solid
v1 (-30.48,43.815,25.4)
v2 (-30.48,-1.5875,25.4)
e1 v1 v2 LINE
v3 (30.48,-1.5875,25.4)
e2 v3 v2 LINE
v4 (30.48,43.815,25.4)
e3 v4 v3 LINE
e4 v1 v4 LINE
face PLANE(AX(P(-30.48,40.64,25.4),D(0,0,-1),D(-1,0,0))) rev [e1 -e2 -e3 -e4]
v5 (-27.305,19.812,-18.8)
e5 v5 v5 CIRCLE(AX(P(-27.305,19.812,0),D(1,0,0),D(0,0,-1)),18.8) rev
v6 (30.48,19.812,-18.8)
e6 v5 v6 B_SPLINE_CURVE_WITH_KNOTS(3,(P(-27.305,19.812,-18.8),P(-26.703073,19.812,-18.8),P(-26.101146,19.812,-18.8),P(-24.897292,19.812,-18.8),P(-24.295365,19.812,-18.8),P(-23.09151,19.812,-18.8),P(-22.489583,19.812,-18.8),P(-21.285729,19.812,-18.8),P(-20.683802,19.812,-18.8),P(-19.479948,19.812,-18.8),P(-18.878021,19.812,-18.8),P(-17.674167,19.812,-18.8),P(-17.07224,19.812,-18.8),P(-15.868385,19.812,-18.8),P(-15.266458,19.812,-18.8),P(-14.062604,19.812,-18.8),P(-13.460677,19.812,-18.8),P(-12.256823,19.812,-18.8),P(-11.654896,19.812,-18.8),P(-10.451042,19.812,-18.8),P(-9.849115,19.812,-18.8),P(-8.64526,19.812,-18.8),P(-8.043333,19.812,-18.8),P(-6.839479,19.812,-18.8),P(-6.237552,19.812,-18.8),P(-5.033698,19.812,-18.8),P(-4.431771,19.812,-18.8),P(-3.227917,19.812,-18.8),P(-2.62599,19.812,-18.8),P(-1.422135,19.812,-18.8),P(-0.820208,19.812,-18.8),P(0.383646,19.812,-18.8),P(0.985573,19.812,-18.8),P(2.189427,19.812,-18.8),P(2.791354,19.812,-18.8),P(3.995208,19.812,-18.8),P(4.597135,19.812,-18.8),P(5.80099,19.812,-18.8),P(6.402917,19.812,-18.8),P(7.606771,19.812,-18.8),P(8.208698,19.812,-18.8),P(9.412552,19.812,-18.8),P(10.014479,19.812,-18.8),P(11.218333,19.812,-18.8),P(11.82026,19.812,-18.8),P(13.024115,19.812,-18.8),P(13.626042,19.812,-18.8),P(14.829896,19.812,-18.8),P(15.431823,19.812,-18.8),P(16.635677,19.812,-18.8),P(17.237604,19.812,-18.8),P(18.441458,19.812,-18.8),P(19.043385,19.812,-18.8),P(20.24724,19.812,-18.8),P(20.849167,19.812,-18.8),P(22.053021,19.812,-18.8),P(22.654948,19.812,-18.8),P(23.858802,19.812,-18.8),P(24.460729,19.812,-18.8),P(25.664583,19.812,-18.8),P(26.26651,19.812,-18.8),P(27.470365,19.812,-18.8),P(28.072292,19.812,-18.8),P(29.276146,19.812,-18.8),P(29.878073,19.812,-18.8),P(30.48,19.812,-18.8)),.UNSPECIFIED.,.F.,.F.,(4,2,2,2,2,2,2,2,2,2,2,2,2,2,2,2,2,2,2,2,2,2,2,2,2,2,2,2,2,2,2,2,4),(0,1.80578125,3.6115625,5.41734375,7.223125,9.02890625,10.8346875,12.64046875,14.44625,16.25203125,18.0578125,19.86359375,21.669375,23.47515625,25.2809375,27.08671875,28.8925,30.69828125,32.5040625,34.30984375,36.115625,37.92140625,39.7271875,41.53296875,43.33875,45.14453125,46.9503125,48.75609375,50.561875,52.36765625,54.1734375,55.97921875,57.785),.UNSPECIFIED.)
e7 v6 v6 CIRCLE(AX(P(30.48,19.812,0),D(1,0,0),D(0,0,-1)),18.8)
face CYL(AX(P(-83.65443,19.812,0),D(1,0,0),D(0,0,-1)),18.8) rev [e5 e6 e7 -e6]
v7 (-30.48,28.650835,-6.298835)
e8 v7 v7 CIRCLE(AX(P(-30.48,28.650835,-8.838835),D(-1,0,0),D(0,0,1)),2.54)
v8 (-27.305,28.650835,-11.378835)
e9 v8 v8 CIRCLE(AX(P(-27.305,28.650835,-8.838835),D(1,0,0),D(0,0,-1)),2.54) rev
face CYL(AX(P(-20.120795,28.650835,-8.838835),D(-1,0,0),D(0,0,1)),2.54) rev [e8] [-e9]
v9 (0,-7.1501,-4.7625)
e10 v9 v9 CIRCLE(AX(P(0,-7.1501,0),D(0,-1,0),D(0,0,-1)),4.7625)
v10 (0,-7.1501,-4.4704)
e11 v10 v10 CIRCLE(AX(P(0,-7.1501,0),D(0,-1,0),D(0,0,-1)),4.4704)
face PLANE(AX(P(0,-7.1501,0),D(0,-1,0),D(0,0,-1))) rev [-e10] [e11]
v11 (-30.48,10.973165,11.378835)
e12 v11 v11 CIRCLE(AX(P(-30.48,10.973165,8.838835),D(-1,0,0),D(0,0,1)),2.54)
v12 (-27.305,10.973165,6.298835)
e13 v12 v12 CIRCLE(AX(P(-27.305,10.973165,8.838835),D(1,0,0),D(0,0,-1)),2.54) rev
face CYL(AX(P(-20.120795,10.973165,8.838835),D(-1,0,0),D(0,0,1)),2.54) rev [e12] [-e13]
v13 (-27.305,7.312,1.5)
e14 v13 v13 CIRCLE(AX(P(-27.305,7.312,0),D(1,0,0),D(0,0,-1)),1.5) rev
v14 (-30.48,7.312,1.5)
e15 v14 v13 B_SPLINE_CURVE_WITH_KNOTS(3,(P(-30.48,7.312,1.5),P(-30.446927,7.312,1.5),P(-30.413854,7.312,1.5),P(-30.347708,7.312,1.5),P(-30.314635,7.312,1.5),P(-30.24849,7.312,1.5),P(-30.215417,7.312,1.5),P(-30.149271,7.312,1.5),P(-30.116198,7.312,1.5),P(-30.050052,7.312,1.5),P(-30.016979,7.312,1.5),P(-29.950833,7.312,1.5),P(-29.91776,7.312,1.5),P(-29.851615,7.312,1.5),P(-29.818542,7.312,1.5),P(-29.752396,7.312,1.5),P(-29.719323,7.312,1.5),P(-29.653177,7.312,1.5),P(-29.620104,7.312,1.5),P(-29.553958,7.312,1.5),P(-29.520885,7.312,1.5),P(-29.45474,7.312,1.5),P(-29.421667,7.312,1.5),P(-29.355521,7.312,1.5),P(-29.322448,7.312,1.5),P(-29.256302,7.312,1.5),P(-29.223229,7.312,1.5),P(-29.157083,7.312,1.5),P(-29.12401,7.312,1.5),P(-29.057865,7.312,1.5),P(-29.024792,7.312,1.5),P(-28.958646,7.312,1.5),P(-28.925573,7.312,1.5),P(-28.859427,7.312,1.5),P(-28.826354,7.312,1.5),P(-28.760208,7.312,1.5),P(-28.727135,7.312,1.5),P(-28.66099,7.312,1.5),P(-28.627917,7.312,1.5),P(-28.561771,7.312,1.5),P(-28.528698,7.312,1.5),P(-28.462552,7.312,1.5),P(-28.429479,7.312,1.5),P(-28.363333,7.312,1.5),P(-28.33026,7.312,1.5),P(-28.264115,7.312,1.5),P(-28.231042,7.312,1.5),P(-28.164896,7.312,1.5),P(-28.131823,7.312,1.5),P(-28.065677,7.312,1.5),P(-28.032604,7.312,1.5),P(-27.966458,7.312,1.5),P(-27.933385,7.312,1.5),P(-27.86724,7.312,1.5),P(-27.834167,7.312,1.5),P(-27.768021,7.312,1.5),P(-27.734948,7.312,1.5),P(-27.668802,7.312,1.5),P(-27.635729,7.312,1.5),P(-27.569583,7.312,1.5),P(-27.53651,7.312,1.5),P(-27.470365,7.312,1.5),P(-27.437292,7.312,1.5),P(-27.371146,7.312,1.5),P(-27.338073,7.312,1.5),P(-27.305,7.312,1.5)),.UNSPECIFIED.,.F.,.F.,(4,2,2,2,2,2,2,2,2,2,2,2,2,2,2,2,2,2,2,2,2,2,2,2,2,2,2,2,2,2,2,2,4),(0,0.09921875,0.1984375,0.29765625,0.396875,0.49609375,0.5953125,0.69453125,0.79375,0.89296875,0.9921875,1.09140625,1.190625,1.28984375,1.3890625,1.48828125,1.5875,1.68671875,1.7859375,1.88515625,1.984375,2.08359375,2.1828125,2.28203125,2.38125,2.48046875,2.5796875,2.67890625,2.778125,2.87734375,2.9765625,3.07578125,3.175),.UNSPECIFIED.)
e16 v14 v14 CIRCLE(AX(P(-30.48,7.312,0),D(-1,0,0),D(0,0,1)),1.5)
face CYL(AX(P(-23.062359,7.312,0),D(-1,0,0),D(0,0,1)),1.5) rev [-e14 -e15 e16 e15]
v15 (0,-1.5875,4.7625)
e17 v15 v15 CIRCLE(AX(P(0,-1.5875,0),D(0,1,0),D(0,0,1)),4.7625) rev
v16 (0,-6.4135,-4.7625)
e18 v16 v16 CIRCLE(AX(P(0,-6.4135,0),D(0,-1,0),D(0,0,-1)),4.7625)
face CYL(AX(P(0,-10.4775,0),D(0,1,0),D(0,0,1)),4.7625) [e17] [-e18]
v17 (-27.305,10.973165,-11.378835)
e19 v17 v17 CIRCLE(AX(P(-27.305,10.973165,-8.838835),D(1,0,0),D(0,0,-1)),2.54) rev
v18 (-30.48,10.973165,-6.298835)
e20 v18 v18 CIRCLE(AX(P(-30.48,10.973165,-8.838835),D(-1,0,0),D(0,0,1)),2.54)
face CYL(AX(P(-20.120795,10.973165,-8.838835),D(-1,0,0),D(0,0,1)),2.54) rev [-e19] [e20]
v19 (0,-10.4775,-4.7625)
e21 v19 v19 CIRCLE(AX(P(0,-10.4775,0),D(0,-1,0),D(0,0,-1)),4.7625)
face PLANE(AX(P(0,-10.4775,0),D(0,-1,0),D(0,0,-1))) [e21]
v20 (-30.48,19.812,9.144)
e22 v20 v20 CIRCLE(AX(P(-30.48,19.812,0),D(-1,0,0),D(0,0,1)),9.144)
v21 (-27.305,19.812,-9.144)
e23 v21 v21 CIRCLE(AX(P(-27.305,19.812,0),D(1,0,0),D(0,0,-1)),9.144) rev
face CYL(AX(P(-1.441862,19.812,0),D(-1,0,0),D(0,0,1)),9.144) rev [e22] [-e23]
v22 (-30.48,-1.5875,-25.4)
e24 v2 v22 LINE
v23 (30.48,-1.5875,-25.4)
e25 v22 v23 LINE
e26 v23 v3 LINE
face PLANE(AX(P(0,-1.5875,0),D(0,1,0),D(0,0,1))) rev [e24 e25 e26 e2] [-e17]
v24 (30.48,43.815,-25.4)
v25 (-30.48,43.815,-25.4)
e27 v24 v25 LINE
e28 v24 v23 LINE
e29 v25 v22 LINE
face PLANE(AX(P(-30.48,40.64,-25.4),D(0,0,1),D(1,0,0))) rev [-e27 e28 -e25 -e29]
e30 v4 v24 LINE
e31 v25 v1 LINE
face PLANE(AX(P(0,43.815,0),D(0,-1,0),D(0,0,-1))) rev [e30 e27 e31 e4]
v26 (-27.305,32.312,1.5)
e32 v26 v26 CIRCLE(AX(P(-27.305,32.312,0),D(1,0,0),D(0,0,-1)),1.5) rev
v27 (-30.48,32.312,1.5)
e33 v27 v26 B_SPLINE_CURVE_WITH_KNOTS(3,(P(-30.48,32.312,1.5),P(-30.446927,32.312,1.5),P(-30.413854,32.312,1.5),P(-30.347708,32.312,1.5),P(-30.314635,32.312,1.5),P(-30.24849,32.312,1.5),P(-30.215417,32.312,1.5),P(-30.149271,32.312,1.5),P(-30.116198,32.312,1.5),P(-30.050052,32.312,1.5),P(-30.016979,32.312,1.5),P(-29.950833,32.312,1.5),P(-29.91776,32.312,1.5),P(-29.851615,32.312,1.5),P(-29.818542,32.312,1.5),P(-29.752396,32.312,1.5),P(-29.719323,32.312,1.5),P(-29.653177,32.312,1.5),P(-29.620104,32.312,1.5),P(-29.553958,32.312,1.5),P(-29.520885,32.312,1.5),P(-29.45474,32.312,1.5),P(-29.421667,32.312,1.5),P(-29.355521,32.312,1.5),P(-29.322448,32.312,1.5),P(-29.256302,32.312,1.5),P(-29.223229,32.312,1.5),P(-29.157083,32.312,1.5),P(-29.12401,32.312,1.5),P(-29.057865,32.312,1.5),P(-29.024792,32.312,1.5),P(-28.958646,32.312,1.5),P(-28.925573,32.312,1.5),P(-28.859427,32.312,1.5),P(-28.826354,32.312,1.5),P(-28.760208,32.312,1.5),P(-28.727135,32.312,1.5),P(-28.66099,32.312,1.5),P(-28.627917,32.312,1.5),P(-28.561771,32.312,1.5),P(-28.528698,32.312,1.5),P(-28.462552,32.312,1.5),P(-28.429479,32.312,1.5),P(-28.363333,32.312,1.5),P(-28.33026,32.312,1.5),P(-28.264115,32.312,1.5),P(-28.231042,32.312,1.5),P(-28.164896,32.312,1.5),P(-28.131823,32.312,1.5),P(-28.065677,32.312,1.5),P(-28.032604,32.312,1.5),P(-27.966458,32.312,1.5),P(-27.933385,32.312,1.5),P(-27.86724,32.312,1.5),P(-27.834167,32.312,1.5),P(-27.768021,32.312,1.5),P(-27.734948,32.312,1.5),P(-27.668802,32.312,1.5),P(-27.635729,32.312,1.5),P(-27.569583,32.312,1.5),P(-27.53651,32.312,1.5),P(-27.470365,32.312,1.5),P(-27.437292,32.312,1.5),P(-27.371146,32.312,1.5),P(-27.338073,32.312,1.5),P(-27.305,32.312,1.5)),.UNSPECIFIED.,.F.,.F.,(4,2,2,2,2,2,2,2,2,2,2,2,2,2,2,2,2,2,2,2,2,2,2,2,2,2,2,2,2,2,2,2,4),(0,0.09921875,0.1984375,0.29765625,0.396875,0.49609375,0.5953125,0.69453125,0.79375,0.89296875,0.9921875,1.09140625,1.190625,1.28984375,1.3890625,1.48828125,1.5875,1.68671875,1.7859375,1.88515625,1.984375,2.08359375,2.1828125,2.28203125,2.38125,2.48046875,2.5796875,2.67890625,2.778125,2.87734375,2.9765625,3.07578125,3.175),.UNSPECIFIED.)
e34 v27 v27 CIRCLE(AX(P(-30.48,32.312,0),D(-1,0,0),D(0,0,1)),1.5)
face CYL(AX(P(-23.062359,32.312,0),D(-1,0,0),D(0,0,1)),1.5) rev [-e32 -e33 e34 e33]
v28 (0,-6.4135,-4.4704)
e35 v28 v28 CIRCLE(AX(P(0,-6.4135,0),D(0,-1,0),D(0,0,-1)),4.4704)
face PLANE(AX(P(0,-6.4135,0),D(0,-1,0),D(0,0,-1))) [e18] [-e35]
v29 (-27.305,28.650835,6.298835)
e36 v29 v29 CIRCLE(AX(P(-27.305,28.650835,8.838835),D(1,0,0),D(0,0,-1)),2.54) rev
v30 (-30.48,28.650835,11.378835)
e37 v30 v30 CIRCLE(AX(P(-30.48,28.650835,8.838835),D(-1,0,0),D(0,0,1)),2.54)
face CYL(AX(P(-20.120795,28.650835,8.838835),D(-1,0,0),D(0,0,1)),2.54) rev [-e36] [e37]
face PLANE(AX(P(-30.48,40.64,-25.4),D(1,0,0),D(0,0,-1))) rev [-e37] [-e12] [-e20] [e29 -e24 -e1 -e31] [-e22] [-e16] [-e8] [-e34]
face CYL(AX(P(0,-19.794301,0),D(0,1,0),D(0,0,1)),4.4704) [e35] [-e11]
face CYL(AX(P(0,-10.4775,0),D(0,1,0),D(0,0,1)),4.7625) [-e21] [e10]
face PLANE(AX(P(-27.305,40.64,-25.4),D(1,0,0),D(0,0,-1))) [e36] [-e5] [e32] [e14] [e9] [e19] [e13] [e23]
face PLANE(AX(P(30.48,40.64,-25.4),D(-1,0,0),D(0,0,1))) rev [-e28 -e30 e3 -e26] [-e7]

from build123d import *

# Parameters (mm, degrees)
SKETCH1_W              = 60.96
SKETCH1_H              = 50.8
BOSS_EXTRUDE1_DEPTH    = 40.64
SKETCH3_W              = 60.96
SKETCH3_H              = 50.8
BOSS_EXTRUDE2_DEPTH    = 1.5875
SKETCH2_R              = 18.8
CUT_EXTRUDE1_DEPTH     = 57.785
SKETCH4_W              = 60.96
SKETCH4_H              = 50.8
BOSS_EXTRUDE3_DEPTH    = 3.175
SKETCH6_R              = 9.144
CUT_EXTRUDE2_DEPTH     = 3.175
SKETCH7_R              = 1.5
CUT_EXTRUDE3_DEPTH     = 3.175
SKETCH8_R              = 4.7625
BOSS_EXTRUDE4_DEPTH    = 8.89
CUT_EXTRUDE4_START     = -7.1501
CUT_EXTRUDE4_OUTLINE_R = 4.7625
CUT_EXTRUDE4_DEPTH     = 0.7366
SKETCH9_R              = 4.4704
BOSS_EXTRUDE5_DEPTH    = 0.7366
SKETCH13_R             = 2.54
CUT_EXTRUDE6_DEPTH     = 3.175


# Read off the part's stored shape, not the designer's step: Cut-Extrude4
with BuildPart() as part:
    # Sketch1 → Boss-Extrude1 (new body)
    with BuildSketch(Plane(origin=(0, 0, 0), x_dir=(1, 0, 0), z_dir=(0, 1, 0))):
        Rectangle(SKETCH1_W, SKETCH1_H)
    extrude(amount=BOSS_EXTRUDE1_DEPTH)

    # Sketch3 → Boss-Extrude2 (add)
    with BuildSketch(Plane(origin=(0, 0, 0), x_dir=(-1, 0, 0), z_dir=(0, -1, 0))):
        Rectangle(SKETCH3_W, SKETCH3_H)
    extrude(amount=BOSS_EXTRUDE2_DEPTH)

    # Sketch2 → Cut-Extrude1 (cut)
    with BuildSketch(Plane(origin=(30.48, 0, 0), x_dir=(0, 0, -1), z_dir=(1, 0, 0))):
        with Locations((0, 19.812)):
            Circle(SKETCH2_R)
    extrude(amount=-CUT_EXTRUDE1_DEPTH, mode=Mode.SUBTRACT)

    # Sketch4 → Boss-Extrude3 (add)
    with BuildSketch(Plane(origin=(0, 40.64, 0), x_dir=(1, 0, 0), z_dir=(0, 1, 0))):
        Rectangle(SKETCH4_W, SKETCH4_H)
    extrude(amount=BOSS_EXTRUDE3_DEPTH)

    # Sketch6 → Cut-Extrude2 (cut)
    with BuildSketch(Plane.ZY.offset(30.48)):
        with Locations((0, 19.812)):
            Circle(SKETCH6_R)
    extrude(amount=-CUT_EXTRUDE2_DEPTH, mode=Mode.SUBTRACT)

    # Sketch7 → Cut-Extrude3 (cut)
    with BuildSketch(Plane.ZY.offset(30.48)):
        with Locations((0, 32.312000019)):
            Circle(SKETCH7_R)
        with Locations((0, 7.311999981)):
            Circle(SKETCH7_R)
    extrude(amount=-CUT_EXTRUDE3_DEPTH, mode=Mode.SUBTRACT)

    # Sketch8 → Boss-Extrude4 (add)
    with BuildSketch(Plane.XZ.offset(1.5875)):
        with Locations(Location((0, 0, 0), (0, 0, 90))):
            Circle(SKETCH8_R)
    extrude(amount=BOSS_EXTRUDE4_DEPTH)

    # Cut-Extrude4 outline → Cut-Extrude4 (cut)
    with BuildSketch(Plane(origin=(0, 0, 0), x_dir=(1, 0, 0), z_dir=(0, 1, 0)).offset(CUT_EXTRUDE4_START)):
        Circle(CUT_EXTRUDE4_OUTLINE_R)
    extrude(amount=CUT_EXTRUDE4_DEPTH, mode=Mode.SUBTRACT)

    # Sketch9 → Boss-Extrude5 (add)
    with BuildSketch(Plane(origin=(0, -6.4135, 0), x_dir=(-1, 0, 0), z_dir=(0, -1, 0))):
        with Locations(Location((0, 0, 0), (0, 0, 90))):
            Circle(SKETCH9_R)
    extrude(amount=BOSS_EXTRUDE5_DEPTH)

    # Sketch13 → Cut-Extrude6 (cut)
    with BuildSketch(Plane.ZY.offset(30.48)):
        with Locations((8.838834778, 28.650834778)):
            Circle(SKETCH13_R)
        with Locations((-8.838834778, 28.650834778)):
            Circle(SKETCH13_R)
        with Locations((-8.838834778, 10.973165222)):
            Circle(SKETCH13_R)
        with Locations((8.838834778, 10.973165222)):
            Circle(SKETCH13_R)
    extrude(amount=-CUT_EXTRUDE6_DEPTH, mode=Mode.SUBTRACT)


solid = part.part
